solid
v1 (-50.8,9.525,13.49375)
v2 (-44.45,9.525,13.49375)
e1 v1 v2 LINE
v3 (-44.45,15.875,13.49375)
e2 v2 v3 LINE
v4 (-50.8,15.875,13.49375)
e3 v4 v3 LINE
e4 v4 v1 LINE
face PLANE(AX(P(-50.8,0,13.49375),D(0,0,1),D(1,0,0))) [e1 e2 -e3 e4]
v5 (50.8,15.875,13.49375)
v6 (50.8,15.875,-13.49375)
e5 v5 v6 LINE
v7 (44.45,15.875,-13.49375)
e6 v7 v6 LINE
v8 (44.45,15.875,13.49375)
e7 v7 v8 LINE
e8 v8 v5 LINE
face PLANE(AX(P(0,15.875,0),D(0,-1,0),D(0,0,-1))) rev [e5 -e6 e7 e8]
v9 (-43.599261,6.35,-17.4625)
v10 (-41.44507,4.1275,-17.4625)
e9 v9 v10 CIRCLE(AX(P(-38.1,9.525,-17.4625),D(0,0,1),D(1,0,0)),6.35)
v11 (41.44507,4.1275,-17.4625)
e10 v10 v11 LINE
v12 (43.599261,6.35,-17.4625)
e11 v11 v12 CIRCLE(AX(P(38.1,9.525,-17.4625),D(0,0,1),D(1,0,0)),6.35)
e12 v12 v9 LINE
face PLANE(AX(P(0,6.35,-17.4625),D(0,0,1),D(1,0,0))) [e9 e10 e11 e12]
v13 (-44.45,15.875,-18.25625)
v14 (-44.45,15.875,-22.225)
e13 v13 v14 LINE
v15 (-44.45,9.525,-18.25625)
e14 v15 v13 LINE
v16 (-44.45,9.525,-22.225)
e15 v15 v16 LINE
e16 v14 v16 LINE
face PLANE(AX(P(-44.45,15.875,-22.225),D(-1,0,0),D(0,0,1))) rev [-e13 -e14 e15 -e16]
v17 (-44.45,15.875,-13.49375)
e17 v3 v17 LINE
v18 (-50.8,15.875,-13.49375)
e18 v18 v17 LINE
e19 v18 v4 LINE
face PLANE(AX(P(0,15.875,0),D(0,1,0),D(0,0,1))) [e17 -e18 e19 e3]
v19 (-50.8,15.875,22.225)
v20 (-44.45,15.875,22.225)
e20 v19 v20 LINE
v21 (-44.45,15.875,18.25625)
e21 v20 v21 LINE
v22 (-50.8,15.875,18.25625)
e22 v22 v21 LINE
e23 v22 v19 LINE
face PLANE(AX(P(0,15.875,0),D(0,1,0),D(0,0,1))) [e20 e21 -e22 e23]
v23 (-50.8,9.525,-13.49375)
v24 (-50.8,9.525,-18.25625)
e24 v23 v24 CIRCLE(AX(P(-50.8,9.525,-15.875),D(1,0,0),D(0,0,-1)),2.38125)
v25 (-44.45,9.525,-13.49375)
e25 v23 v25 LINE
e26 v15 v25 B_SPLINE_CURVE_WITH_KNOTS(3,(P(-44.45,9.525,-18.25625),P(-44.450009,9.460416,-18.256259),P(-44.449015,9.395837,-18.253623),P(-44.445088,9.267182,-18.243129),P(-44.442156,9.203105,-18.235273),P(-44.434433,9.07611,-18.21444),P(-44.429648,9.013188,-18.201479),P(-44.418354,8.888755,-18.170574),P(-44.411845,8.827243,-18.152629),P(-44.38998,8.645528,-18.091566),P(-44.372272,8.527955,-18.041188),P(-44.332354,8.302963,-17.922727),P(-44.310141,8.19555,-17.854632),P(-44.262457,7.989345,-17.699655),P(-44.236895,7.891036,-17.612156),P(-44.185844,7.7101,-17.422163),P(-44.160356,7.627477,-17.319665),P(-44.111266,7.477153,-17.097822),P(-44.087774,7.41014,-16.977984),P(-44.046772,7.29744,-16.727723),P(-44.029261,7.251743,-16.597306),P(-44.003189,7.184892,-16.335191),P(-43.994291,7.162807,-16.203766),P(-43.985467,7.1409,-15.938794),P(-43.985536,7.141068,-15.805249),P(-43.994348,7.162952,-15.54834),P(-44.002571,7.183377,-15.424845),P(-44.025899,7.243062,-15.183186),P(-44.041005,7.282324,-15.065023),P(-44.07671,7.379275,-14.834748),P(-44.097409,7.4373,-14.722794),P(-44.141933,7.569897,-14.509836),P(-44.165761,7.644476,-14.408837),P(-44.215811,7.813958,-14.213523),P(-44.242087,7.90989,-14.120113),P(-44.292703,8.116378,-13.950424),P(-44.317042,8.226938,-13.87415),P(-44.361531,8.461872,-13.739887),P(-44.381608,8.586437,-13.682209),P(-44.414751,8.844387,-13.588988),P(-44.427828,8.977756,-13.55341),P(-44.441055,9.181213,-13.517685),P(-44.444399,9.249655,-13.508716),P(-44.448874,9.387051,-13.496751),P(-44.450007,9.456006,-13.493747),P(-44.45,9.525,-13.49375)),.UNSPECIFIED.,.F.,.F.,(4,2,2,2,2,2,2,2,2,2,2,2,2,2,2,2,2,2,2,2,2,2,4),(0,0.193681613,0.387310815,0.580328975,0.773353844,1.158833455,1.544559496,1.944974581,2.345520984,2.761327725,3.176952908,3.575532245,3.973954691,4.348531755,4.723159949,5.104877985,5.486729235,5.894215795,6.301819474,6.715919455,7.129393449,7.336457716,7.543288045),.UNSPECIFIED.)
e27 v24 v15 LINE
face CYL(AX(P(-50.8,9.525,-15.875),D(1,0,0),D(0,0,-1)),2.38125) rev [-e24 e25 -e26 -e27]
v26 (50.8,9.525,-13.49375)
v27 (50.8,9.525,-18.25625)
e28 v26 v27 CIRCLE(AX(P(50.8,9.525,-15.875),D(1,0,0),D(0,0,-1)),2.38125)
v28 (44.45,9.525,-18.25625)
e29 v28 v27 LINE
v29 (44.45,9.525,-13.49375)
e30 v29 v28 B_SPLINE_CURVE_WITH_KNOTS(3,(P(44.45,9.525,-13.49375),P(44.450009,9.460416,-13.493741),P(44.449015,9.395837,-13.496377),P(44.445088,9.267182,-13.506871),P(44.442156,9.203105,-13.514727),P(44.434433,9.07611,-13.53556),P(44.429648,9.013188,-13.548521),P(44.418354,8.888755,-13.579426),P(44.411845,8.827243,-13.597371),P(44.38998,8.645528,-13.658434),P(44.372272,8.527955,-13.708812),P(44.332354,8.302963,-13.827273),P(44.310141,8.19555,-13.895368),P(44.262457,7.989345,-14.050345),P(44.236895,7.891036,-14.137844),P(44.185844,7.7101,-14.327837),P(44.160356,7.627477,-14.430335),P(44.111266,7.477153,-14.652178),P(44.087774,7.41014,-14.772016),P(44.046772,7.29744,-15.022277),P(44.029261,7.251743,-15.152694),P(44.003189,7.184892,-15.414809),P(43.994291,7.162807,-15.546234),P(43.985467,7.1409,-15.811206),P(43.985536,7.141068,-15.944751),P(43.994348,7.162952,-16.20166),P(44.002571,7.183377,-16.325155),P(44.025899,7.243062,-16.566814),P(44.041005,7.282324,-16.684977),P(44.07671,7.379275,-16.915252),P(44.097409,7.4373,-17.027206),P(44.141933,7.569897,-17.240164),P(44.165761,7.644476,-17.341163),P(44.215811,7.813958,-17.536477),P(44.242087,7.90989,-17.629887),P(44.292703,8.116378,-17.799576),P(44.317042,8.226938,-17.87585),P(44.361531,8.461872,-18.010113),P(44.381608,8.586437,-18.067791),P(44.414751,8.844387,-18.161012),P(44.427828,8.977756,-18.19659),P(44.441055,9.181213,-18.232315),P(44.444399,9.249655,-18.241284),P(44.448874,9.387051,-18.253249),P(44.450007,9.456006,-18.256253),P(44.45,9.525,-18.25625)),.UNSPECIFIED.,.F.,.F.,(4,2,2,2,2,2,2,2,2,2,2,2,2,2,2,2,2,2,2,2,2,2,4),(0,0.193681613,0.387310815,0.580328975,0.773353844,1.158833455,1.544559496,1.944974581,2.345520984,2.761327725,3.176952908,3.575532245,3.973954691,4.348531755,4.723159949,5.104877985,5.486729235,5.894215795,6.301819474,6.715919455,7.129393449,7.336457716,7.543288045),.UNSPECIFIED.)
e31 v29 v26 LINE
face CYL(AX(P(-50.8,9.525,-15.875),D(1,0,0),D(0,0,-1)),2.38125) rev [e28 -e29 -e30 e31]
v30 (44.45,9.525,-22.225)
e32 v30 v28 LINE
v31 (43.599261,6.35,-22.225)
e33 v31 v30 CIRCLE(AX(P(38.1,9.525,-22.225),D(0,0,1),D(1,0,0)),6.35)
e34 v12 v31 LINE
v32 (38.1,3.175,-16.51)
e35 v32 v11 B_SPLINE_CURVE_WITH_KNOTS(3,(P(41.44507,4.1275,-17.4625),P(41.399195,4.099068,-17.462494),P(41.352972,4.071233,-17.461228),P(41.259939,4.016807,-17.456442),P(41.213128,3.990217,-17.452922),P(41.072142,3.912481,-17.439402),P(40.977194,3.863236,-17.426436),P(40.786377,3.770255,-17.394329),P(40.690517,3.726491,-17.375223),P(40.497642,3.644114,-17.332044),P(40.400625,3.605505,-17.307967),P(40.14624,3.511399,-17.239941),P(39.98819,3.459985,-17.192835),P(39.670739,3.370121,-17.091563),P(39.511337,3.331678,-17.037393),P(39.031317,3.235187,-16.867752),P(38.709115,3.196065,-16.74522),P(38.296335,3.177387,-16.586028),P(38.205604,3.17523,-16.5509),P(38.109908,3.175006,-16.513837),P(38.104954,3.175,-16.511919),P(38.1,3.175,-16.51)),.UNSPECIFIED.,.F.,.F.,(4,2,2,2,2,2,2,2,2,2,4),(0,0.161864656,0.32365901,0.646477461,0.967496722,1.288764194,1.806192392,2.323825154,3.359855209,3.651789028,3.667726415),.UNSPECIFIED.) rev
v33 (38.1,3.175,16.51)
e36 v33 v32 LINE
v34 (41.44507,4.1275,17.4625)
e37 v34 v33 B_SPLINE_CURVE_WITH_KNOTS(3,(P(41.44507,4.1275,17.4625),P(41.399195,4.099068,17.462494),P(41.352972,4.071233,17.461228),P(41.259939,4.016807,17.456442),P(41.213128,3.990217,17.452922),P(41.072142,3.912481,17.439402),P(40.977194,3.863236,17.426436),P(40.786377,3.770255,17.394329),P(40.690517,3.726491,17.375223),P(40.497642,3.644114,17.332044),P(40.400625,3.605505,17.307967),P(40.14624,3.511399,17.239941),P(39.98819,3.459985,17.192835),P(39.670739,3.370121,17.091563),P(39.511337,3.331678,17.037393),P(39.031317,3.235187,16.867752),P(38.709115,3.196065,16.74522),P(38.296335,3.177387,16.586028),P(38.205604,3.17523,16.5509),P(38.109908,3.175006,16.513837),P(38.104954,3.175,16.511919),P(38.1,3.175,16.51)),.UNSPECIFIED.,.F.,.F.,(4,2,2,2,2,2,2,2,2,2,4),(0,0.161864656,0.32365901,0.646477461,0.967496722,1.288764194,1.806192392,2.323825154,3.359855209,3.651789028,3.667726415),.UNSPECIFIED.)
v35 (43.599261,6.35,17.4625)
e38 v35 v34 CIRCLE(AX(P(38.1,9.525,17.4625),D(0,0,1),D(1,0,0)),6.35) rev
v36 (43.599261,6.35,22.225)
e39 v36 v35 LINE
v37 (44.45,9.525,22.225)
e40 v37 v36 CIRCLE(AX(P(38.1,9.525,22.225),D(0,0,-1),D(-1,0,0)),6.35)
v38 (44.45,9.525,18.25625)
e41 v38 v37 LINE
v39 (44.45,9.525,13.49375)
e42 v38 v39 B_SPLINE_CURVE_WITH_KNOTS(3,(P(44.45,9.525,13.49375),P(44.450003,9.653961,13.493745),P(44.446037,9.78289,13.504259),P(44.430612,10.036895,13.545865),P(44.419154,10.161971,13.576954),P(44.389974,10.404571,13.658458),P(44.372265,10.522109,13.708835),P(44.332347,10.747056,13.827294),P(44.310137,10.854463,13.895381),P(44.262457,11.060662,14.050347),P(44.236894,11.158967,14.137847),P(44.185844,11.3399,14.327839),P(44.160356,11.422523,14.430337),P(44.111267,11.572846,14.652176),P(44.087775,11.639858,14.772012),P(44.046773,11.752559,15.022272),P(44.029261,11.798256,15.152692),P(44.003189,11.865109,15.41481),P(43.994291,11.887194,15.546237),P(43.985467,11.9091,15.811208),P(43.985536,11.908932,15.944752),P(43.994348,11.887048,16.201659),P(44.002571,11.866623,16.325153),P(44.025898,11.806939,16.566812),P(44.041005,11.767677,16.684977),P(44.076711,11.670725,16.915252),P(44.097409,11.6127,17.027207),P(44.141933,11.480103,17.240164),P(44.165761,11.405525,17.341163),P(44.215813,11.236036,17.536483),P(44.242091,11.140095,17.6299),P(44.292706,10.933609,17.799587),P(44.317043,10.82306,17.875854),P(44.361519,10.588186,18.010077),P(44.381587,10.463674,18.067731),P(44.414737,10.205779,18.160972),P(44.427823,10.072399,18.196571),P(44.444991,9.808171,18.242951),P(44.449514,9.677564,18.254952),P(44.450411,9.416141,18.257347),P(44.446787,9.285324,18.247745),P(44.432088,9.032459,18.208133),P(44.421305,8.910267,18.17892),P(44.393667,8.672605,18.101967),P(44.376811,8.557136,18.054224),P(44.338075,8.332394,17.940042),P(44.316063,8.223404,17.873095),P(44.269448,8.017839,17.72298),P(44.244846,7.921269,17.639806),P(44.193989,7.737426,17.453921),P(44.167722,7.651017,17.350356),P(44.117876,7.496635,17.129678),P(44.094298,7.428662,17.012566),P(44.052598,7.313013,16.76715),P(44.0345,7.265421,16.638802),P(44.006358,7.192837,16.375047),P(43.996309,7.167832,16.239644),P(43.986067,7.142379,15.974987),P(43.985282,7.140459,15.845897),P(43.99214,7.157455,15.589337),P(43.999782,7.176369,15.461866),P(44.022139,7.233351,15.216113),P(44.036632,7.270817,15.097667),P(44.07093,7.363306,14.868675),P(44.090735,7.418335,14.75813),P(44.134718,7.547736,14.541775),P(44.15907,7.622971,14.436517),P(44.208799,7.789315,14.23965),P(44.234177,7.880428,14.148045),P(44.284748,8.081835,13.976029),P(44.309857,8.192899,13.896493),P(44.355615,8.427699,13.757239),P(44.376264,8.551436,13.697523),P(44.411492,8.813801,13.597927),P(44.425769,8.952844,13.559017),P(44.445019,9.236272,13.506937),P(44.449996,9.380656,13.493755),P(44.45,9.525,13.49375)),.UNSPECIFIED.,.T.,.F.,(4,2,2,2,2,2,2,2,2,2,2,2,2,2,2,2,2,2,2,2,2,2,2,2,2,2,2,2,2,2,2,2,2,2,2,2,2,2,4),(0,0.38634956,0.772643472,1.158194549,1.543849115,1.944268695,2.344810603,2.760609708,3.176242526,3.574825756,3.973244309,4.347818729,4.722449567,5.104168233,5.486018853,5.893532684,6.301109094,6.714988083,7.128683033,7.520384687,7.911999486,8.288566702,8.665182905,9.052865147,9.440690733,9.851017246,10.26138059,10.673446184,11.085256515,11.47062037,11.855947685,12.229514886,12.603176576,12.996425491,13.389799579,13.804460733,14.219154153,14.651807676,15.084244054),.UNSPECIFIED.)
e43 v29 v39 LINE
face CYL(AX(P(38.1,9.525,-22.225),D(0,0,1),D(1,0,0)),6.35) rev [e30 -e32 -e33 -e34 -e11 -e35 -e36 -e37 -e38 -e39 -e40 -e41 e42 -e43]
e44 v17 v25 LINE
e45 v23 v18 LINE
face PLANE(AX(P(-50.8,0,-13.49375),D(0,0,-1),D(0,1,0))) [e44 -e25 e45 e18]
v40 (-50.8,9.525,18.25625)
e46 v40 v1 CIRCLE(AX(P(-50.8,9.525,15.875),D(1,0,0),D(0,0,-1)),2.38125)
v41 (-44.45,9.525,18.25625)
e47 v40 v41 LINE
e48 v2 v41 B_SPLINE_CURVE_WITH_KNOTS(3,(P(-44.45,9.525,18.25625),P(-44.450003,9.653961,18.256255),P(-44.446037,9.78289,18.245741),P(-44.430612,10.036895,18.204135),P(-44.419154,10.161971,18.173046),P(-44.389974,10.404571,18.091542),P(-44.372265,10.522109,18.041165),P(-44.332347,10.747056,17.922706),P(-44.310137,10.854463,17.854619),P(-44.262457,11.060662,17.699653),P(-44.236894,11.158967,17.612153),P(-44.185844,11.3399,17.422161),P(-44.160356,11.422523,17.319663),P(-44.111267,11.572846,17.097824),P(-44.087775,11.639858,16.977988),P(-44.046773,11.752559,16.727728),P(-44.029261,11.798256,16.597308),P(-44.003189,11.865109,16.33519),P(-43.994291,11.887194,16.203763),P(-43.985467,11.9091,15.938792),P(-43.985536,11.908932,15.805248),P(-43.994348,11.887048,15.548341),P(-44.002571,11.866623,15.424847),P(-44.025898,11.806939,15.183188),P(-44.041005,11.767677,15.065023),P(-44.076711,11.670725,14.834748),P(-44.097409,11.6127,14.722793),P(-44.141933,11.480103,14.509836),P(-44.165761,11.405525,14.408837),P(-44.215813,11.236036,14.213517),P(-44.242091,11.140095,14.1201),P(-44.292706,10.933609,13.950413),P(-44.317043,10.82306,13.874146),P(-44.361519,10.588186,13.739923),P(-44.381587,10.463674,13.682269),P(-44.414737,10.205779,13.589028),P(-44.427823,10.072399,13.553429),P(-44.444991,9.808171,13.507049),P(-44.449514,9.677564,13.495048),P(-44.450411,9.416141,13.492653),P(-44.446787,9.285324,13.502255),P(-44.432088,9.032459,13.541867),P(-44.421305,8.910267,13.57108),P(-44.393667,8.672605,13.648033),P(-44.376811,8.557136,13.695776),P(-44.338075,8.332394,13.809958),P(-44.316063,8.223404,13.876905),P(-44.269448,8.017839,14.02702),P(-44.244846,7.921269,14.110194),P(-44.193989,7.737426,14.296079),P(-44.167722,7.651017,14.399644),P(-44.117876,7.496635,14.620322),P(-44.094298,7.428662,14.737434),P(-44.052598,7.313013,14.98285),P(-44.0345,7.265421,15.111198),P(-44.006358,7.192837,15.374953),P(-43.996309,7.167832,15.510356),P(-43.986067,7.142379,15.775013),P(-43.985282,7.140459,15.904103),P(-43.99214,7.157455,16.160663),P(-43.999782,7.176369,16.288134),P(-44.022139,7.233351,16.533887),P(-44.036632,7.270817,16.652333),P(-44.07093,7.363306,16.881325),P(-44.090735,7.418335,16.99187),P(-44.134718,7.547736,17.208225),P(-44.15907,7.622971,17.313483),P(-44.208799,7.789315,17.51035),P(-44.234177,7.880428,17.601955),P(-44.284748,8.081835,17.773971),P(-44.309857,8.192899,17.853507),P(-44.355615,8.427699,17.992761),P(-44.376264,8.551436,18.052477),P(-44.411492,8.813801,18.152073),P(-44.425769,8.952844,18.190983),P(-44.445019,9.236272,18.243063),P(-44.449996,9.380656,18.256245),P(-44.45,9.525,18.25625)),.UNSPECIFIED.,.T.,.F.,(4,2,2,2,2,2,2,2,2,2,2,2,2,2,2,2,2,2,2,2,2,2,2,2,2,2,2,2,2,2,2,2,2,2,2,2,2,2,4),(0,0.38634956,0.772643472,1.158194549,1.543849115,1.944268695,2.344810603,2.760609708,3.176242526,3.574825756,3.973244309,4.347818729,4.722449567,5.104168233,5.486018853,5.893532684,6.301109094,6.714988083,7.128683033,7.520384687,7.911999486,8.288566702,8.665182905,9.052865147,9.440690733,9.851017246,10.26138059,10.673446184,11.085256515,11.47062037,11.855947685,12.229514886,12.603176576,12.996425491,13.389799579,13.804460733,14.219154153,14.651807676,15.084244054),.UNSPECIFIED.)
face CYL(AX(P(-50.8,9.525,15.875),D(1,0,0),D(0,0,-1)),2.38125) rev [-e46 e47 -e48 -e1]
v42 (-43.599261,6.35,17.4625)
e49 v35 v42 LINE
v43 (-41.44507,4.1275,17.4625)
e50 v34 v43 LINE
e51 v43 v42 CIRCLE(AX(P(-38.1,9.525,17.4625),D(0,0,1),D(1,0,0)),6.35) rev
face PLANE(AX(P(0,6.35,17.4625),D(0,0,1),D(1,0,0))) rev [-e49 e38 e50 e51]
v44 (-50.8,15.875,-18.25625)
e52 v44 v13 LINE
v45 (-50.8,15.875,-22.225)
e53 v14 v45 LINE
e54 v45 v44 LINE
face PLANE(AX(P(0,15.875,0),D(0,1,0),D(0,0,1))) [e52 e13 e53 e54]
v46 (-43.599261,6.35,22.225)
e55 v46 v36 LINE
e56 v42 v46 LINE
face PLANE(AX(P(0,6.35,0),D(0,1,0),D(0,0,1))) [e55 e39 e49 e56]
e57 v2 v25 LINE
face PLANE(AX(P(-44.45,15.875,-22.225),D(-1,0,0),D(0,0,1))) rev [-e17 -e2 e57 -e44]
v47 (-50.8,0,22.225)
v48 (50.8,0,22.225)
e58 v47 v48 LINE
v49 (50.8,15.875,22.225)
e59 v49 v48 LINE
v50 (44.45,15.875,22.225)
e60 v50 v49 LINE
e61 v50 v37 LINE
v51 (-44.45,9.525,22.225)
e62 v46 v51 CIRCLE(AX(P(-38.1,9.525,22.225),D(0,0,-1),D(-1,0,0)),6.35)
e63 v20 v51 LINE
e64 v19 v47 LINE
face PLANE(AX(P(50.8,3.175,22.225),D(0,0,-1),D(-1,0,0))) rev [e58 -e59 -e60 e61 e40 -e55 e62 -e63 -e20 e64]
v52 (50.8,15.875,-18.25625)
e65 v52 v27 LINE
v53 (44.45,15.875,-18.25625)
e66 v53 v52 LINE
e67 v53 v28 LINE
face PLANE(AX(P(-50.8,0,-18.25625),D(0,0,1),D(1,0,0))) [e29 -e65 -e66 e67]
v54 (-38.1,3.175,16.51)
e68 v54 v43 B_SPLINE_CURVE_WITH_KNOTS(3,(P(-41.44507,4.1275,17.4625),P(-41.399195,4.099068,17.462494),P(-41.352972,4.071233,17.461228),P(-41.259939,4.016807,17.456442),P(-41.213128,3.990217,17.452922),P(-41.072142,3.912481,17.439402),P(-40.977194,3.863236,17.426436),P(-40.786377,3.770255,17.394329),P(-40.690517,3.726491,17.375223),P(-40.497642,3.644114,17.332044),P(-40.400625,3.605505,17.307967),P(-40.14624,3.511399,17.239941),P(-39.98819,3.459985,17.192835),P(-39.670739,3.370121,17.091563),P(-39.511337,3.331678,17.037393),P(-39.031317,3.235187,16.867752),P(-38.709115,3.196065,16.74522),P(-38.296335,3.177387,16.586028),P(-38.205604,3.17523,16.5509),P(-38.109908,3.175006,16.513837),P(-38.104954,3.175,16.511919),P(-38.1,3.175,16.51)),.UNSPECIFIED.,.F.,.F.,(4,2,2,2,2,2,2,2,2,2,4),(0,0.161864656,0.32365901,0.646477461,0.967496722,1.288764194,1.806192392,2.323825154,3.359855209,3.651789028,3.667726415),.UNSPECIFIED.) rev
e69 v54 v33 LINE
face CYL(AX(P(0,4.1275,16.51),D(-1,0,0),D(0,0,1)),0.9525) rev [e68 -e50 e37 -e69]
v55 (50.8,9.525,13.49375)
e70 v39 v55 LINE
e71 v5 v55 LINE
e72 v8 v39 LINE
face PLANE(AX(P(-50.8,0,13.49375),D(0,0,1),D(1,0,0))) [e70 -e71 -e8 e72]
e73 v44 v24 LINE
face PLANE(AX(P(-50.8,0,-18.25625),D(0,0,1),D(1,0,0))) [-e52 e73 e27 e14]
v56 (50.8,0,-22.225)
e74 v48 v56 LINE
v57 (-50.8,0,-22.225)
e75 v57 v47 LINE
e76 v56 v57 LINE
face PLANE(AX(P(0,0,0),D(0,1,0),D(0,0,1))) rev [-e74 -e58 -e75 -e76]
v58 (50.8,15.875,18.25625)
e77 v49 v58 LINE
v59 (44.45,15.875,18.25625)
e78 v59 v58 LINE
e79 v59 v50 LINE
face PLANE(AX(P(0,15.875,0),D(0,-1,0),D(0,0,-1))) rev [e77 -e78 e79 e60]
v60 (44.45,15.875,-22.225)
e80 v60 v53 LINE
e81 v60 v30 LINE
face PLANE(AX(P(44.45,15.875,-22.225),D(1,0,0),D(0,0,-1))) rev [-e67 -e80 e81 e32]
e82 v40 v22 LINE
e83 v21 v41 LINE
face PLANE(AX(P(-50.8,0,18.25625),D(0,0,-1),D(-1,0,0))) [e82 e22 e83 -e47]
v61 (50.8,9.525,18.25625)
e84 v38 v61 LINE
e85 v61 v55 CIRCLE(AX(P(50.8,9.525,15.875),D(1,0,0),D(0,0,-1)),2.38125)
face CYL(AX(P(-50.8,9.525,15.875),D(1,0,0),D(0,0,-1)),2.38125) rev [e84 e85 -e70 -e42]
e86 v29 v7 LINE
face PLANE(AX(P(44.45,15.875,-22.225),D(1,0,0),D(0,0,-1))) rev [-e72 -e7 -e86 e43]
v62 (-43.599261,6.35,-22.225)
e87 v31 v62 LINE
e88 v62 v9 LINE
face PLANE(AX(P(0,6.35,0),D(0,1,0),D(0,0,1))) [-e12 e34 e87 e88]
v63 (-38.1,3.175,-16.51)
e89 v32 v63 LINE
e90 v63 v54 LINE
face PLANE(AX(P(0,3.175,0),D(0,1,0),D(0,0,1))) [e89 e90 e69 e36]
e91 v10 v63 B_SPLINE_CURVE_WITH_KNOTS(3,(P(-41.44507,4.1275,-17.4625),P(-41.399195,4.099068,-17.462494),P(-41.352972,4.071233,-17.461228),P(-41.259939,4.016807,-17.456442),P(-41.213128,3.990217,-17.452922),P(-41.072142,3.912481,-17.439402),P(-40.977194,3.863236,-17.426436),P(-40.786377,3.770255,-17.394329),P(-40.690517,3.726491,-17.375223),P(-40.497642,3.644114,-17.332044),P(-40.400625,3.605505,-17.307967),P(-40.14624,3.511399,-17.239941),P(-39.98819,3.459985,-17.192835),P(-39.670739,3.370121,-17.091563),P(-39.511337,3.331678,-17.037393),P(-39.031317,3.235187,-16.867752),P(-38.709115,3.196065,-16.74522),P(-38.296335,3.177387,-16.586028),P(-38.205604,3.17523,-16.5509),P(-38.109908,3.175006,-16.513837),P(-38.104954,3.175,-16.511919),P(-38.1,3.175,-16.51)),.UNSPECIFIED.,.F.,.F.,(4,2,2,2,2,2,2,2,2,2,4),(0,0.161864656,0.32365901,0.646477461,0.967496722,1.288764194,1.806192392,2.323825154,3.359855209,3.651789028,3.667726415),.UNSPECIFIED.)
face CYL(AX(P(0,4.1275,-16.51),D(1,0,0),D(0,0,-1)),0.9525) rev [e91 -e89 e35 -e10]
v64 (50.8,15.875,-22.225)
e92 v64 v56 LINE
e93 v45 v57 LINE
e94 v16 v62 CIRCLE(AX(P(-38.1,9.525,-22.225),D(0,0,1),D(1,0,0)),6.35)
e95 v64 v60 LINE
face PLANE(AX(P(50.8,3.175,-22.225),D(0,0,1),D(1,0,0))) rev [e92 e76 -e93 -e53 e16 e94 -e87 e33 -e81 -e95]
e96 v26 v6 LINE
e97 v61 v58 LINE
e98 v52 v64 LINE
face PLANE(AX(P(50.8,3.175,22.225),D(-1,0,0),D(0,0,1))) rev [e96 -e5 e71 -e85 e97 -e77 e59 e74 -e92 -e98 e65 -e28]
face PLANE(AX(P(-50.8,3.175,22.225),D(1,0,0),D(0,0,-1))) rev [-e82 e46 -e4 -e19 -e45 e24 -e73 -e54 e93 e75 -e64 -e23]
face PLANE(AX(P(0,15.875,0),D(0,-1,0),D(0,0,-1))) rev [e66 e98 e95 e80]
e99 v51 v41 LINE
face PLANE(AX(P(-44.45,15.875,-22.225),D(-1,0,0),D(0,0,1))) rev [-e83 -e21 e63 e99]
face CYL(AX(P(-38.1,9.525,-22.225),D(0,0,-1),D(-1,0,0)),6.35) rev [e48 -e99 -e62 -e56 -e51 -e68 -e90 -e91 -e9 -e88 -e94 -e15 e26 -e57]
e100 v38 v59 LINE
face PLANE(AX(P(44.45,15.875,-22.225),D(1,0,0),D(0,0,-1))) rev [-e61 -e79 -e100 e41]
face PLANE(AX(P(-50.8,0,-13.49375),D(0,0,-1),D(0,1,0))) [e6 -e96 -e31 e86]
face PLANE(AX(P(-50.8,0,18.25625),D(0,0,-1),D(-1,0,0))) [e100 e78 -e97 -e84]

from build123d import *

# Parameters (mm, degrees)
SKETCH1_W           = 101.6
SKETCH1_H           = 44.45
BOSS_EXTRUDE1_DEPTH = 3.175
SKETCH2_W           = 6.35
SKETCH2_H           = 44.45
BOSS_EXTRUDE2_DEPTH = 12.7
SKETCH3_W           = 88.9
SKETCH3_H           = 4.7625
BOSS_EXTRUDE3_DEPTH = 3.175
FILLET1_R           = 0.9525
FILLET2_R           = 6.35
SKETCH4_R           = 2.38125
CUT_EXTRUDE1_DEPTH  = 106.20706371


with BuildPart() as part:
    # Sketch1 → Boss-Extrude1 (new body)
    with BuildSketch(Plane(origin=(0, 0, 0), x_dir=(1, 0, 0), z_dir=(0, 1, 0))):
        Rectangle(SKETCH1_W, SKETCH1_H)
    extrude(amount=BOSS_EXTRUDE1_DEPTH)

    # Sketch2 → Boss-Extrude2 (add)
    with BuildSketch(Plane(origin=(0, 3.175, 0), x_dir=(1, 0, 0), z_dir=(0, 1, 0))):
        with Locations((-47.625, 0)):
            Rectangle(SKETCH2_W, SKETCH2_H)
        with Locations((47.625, 0)):
            Rectangle(SKETCH2_W, SKETCH2_H)
    extrude(amount=BOSS_EXTRUDE2_DEPTH)

    # Sketch3 → Boss-Extrude3 (add)
    with BuildSketch(Plane(origin=(0, 3.175, 0), x_dir=(1, 0, 0), z_dir=(0, 1, 0))):
        with Locations((0, 19.84375)):
            Rectangle(SKETCH3_W, SKETCH3_H)
        with Locations((0, -19.84375)):
            Rectangle(SKETCH3_W, SKETCH3_H)
    extrude(amount=BOSS_EXTRUDE3_DEPTH)

    # Fillet1
    fillet1_edges = [part.edges().sort_by_distance(p)[0] for p in [
        (0, 3.175, 17.4625),
        (0, 3.175, -17.4625),
    ]]
    fillet(fillet1_edges, radius=FILLET1_R)

    # Fillet2
    # the kernel refuses this fillet: 6.35 mm, written as the material it adds along each edge
    with BuildSketch(Plane(origin=(44.45, 3.175, -32.385), x_dir=(0, 1, 0), z_dir=(0, 0, 1))) as fillet2_piece_1_section:
        with BuildLine():
            CenterArc((FILLET2_R, FILLET2_R), FILLET2_R, 180, 90)
            Line((0, FILLET2_R), (0, 0))
            Line((0, 0), (FILLET2_R, 0))
        make_face()
    fillet2_piece_1 = extrude(amount=64.77, mode=Mode.PRIVATE)
    fillet2_piece_1 = split(fillet2_piece_1, bisect_by=Plane(origin=(44.198002836, 7.13272394, -22.225), z_dir=(0, 0, 1)), keep=Keep.TOP, mode=Mode.PRIVATE)
    fillet2_piece_1 = split(fillet2_piece_1, bisect_by=Plane(origin=(44.198002836, 7.13272394, 22.225), z_dir=(0, 0, -1)), keep=Keep.TOP, mode=Mode.PRIVATE)
    add(fillet2_piece_1)
    with BuildSketch(Plane(origin=(-44.45, 3.175, -32.385), x_dir=(1, 0, 0), z_dir=(0, 0, 1))) as fillet2_piece_2_section:
        with BuildLine():
            CenterArc((FILLET2_R, FILLET2_R), FILLET2_R, 180, 90)
            Line((0, FILLET2_R), (0, 0))
            Line((0, 0), (FILLET2_R, 0))
        make_face()
    fillet2_piece_2 = extrude(amount=64.77, mode=Mode.PRIVATE)
    fillet2_piece_2 = split(fillet2_piece_2, bisect_by=Plane(origin=(-44.198002836, 7.13272394, -22.225), z_dir=(0, 0, 1)), keep=Keep.TOP, mode=Mode.PRIVATE)
    fillet2_piece_2 = split(fillet2_piece_2, bisect_by=Plane(origin=(-44.198002836, 7.13272394, 22.225), z_dir=(0, 0, -1)), keep=Keep.TOP, mode=Mode.PRIVATE)
    add(fillet2_piece_2)

    # Sketch4 → Cut-Extrude1 (cut, through all)
    with BuildSketch(Plane(origin=(50.8, 0, 0), x_dir=(0, 0, -1), z_dir=(1, 0, 0))):
        with BuildLine():
            Line((-18.25625, 15.875), (-18.25625, 9.525))
            ThreePointArc((-18.25625, 9.525), (-15.875, 11.90625), (-13.49375, 9.525))
            Line((-13.49375, 9.525), (-13.49375, 15.875))
            Line((-13.49375, 15.875), (-18.25625, 15.875))
        make_face()
        with Locations((-15.875, 9.525)):
            Circle(SKETCH4_R)
        with Locations((15.875, 9.525)):
            Circle(SKETCH4_R)
        with BuildLine():
            Line((18.25625, 15.875), (13.49375, 15.875))
            Line((13.49375, 15.875), (13.49375, 9.525))
            ThreePointArc((13.49375, 9.525), (15.875, 11.90625), (18.25625, 9.525))
            Line((18.25625, 9.525), (18.25625, 15.875))
        make_face()
    extrude(amount=-CUT_EXTRUDE1_DEPTH, mode=Mode.SUBTRACT)


solid = part.part
